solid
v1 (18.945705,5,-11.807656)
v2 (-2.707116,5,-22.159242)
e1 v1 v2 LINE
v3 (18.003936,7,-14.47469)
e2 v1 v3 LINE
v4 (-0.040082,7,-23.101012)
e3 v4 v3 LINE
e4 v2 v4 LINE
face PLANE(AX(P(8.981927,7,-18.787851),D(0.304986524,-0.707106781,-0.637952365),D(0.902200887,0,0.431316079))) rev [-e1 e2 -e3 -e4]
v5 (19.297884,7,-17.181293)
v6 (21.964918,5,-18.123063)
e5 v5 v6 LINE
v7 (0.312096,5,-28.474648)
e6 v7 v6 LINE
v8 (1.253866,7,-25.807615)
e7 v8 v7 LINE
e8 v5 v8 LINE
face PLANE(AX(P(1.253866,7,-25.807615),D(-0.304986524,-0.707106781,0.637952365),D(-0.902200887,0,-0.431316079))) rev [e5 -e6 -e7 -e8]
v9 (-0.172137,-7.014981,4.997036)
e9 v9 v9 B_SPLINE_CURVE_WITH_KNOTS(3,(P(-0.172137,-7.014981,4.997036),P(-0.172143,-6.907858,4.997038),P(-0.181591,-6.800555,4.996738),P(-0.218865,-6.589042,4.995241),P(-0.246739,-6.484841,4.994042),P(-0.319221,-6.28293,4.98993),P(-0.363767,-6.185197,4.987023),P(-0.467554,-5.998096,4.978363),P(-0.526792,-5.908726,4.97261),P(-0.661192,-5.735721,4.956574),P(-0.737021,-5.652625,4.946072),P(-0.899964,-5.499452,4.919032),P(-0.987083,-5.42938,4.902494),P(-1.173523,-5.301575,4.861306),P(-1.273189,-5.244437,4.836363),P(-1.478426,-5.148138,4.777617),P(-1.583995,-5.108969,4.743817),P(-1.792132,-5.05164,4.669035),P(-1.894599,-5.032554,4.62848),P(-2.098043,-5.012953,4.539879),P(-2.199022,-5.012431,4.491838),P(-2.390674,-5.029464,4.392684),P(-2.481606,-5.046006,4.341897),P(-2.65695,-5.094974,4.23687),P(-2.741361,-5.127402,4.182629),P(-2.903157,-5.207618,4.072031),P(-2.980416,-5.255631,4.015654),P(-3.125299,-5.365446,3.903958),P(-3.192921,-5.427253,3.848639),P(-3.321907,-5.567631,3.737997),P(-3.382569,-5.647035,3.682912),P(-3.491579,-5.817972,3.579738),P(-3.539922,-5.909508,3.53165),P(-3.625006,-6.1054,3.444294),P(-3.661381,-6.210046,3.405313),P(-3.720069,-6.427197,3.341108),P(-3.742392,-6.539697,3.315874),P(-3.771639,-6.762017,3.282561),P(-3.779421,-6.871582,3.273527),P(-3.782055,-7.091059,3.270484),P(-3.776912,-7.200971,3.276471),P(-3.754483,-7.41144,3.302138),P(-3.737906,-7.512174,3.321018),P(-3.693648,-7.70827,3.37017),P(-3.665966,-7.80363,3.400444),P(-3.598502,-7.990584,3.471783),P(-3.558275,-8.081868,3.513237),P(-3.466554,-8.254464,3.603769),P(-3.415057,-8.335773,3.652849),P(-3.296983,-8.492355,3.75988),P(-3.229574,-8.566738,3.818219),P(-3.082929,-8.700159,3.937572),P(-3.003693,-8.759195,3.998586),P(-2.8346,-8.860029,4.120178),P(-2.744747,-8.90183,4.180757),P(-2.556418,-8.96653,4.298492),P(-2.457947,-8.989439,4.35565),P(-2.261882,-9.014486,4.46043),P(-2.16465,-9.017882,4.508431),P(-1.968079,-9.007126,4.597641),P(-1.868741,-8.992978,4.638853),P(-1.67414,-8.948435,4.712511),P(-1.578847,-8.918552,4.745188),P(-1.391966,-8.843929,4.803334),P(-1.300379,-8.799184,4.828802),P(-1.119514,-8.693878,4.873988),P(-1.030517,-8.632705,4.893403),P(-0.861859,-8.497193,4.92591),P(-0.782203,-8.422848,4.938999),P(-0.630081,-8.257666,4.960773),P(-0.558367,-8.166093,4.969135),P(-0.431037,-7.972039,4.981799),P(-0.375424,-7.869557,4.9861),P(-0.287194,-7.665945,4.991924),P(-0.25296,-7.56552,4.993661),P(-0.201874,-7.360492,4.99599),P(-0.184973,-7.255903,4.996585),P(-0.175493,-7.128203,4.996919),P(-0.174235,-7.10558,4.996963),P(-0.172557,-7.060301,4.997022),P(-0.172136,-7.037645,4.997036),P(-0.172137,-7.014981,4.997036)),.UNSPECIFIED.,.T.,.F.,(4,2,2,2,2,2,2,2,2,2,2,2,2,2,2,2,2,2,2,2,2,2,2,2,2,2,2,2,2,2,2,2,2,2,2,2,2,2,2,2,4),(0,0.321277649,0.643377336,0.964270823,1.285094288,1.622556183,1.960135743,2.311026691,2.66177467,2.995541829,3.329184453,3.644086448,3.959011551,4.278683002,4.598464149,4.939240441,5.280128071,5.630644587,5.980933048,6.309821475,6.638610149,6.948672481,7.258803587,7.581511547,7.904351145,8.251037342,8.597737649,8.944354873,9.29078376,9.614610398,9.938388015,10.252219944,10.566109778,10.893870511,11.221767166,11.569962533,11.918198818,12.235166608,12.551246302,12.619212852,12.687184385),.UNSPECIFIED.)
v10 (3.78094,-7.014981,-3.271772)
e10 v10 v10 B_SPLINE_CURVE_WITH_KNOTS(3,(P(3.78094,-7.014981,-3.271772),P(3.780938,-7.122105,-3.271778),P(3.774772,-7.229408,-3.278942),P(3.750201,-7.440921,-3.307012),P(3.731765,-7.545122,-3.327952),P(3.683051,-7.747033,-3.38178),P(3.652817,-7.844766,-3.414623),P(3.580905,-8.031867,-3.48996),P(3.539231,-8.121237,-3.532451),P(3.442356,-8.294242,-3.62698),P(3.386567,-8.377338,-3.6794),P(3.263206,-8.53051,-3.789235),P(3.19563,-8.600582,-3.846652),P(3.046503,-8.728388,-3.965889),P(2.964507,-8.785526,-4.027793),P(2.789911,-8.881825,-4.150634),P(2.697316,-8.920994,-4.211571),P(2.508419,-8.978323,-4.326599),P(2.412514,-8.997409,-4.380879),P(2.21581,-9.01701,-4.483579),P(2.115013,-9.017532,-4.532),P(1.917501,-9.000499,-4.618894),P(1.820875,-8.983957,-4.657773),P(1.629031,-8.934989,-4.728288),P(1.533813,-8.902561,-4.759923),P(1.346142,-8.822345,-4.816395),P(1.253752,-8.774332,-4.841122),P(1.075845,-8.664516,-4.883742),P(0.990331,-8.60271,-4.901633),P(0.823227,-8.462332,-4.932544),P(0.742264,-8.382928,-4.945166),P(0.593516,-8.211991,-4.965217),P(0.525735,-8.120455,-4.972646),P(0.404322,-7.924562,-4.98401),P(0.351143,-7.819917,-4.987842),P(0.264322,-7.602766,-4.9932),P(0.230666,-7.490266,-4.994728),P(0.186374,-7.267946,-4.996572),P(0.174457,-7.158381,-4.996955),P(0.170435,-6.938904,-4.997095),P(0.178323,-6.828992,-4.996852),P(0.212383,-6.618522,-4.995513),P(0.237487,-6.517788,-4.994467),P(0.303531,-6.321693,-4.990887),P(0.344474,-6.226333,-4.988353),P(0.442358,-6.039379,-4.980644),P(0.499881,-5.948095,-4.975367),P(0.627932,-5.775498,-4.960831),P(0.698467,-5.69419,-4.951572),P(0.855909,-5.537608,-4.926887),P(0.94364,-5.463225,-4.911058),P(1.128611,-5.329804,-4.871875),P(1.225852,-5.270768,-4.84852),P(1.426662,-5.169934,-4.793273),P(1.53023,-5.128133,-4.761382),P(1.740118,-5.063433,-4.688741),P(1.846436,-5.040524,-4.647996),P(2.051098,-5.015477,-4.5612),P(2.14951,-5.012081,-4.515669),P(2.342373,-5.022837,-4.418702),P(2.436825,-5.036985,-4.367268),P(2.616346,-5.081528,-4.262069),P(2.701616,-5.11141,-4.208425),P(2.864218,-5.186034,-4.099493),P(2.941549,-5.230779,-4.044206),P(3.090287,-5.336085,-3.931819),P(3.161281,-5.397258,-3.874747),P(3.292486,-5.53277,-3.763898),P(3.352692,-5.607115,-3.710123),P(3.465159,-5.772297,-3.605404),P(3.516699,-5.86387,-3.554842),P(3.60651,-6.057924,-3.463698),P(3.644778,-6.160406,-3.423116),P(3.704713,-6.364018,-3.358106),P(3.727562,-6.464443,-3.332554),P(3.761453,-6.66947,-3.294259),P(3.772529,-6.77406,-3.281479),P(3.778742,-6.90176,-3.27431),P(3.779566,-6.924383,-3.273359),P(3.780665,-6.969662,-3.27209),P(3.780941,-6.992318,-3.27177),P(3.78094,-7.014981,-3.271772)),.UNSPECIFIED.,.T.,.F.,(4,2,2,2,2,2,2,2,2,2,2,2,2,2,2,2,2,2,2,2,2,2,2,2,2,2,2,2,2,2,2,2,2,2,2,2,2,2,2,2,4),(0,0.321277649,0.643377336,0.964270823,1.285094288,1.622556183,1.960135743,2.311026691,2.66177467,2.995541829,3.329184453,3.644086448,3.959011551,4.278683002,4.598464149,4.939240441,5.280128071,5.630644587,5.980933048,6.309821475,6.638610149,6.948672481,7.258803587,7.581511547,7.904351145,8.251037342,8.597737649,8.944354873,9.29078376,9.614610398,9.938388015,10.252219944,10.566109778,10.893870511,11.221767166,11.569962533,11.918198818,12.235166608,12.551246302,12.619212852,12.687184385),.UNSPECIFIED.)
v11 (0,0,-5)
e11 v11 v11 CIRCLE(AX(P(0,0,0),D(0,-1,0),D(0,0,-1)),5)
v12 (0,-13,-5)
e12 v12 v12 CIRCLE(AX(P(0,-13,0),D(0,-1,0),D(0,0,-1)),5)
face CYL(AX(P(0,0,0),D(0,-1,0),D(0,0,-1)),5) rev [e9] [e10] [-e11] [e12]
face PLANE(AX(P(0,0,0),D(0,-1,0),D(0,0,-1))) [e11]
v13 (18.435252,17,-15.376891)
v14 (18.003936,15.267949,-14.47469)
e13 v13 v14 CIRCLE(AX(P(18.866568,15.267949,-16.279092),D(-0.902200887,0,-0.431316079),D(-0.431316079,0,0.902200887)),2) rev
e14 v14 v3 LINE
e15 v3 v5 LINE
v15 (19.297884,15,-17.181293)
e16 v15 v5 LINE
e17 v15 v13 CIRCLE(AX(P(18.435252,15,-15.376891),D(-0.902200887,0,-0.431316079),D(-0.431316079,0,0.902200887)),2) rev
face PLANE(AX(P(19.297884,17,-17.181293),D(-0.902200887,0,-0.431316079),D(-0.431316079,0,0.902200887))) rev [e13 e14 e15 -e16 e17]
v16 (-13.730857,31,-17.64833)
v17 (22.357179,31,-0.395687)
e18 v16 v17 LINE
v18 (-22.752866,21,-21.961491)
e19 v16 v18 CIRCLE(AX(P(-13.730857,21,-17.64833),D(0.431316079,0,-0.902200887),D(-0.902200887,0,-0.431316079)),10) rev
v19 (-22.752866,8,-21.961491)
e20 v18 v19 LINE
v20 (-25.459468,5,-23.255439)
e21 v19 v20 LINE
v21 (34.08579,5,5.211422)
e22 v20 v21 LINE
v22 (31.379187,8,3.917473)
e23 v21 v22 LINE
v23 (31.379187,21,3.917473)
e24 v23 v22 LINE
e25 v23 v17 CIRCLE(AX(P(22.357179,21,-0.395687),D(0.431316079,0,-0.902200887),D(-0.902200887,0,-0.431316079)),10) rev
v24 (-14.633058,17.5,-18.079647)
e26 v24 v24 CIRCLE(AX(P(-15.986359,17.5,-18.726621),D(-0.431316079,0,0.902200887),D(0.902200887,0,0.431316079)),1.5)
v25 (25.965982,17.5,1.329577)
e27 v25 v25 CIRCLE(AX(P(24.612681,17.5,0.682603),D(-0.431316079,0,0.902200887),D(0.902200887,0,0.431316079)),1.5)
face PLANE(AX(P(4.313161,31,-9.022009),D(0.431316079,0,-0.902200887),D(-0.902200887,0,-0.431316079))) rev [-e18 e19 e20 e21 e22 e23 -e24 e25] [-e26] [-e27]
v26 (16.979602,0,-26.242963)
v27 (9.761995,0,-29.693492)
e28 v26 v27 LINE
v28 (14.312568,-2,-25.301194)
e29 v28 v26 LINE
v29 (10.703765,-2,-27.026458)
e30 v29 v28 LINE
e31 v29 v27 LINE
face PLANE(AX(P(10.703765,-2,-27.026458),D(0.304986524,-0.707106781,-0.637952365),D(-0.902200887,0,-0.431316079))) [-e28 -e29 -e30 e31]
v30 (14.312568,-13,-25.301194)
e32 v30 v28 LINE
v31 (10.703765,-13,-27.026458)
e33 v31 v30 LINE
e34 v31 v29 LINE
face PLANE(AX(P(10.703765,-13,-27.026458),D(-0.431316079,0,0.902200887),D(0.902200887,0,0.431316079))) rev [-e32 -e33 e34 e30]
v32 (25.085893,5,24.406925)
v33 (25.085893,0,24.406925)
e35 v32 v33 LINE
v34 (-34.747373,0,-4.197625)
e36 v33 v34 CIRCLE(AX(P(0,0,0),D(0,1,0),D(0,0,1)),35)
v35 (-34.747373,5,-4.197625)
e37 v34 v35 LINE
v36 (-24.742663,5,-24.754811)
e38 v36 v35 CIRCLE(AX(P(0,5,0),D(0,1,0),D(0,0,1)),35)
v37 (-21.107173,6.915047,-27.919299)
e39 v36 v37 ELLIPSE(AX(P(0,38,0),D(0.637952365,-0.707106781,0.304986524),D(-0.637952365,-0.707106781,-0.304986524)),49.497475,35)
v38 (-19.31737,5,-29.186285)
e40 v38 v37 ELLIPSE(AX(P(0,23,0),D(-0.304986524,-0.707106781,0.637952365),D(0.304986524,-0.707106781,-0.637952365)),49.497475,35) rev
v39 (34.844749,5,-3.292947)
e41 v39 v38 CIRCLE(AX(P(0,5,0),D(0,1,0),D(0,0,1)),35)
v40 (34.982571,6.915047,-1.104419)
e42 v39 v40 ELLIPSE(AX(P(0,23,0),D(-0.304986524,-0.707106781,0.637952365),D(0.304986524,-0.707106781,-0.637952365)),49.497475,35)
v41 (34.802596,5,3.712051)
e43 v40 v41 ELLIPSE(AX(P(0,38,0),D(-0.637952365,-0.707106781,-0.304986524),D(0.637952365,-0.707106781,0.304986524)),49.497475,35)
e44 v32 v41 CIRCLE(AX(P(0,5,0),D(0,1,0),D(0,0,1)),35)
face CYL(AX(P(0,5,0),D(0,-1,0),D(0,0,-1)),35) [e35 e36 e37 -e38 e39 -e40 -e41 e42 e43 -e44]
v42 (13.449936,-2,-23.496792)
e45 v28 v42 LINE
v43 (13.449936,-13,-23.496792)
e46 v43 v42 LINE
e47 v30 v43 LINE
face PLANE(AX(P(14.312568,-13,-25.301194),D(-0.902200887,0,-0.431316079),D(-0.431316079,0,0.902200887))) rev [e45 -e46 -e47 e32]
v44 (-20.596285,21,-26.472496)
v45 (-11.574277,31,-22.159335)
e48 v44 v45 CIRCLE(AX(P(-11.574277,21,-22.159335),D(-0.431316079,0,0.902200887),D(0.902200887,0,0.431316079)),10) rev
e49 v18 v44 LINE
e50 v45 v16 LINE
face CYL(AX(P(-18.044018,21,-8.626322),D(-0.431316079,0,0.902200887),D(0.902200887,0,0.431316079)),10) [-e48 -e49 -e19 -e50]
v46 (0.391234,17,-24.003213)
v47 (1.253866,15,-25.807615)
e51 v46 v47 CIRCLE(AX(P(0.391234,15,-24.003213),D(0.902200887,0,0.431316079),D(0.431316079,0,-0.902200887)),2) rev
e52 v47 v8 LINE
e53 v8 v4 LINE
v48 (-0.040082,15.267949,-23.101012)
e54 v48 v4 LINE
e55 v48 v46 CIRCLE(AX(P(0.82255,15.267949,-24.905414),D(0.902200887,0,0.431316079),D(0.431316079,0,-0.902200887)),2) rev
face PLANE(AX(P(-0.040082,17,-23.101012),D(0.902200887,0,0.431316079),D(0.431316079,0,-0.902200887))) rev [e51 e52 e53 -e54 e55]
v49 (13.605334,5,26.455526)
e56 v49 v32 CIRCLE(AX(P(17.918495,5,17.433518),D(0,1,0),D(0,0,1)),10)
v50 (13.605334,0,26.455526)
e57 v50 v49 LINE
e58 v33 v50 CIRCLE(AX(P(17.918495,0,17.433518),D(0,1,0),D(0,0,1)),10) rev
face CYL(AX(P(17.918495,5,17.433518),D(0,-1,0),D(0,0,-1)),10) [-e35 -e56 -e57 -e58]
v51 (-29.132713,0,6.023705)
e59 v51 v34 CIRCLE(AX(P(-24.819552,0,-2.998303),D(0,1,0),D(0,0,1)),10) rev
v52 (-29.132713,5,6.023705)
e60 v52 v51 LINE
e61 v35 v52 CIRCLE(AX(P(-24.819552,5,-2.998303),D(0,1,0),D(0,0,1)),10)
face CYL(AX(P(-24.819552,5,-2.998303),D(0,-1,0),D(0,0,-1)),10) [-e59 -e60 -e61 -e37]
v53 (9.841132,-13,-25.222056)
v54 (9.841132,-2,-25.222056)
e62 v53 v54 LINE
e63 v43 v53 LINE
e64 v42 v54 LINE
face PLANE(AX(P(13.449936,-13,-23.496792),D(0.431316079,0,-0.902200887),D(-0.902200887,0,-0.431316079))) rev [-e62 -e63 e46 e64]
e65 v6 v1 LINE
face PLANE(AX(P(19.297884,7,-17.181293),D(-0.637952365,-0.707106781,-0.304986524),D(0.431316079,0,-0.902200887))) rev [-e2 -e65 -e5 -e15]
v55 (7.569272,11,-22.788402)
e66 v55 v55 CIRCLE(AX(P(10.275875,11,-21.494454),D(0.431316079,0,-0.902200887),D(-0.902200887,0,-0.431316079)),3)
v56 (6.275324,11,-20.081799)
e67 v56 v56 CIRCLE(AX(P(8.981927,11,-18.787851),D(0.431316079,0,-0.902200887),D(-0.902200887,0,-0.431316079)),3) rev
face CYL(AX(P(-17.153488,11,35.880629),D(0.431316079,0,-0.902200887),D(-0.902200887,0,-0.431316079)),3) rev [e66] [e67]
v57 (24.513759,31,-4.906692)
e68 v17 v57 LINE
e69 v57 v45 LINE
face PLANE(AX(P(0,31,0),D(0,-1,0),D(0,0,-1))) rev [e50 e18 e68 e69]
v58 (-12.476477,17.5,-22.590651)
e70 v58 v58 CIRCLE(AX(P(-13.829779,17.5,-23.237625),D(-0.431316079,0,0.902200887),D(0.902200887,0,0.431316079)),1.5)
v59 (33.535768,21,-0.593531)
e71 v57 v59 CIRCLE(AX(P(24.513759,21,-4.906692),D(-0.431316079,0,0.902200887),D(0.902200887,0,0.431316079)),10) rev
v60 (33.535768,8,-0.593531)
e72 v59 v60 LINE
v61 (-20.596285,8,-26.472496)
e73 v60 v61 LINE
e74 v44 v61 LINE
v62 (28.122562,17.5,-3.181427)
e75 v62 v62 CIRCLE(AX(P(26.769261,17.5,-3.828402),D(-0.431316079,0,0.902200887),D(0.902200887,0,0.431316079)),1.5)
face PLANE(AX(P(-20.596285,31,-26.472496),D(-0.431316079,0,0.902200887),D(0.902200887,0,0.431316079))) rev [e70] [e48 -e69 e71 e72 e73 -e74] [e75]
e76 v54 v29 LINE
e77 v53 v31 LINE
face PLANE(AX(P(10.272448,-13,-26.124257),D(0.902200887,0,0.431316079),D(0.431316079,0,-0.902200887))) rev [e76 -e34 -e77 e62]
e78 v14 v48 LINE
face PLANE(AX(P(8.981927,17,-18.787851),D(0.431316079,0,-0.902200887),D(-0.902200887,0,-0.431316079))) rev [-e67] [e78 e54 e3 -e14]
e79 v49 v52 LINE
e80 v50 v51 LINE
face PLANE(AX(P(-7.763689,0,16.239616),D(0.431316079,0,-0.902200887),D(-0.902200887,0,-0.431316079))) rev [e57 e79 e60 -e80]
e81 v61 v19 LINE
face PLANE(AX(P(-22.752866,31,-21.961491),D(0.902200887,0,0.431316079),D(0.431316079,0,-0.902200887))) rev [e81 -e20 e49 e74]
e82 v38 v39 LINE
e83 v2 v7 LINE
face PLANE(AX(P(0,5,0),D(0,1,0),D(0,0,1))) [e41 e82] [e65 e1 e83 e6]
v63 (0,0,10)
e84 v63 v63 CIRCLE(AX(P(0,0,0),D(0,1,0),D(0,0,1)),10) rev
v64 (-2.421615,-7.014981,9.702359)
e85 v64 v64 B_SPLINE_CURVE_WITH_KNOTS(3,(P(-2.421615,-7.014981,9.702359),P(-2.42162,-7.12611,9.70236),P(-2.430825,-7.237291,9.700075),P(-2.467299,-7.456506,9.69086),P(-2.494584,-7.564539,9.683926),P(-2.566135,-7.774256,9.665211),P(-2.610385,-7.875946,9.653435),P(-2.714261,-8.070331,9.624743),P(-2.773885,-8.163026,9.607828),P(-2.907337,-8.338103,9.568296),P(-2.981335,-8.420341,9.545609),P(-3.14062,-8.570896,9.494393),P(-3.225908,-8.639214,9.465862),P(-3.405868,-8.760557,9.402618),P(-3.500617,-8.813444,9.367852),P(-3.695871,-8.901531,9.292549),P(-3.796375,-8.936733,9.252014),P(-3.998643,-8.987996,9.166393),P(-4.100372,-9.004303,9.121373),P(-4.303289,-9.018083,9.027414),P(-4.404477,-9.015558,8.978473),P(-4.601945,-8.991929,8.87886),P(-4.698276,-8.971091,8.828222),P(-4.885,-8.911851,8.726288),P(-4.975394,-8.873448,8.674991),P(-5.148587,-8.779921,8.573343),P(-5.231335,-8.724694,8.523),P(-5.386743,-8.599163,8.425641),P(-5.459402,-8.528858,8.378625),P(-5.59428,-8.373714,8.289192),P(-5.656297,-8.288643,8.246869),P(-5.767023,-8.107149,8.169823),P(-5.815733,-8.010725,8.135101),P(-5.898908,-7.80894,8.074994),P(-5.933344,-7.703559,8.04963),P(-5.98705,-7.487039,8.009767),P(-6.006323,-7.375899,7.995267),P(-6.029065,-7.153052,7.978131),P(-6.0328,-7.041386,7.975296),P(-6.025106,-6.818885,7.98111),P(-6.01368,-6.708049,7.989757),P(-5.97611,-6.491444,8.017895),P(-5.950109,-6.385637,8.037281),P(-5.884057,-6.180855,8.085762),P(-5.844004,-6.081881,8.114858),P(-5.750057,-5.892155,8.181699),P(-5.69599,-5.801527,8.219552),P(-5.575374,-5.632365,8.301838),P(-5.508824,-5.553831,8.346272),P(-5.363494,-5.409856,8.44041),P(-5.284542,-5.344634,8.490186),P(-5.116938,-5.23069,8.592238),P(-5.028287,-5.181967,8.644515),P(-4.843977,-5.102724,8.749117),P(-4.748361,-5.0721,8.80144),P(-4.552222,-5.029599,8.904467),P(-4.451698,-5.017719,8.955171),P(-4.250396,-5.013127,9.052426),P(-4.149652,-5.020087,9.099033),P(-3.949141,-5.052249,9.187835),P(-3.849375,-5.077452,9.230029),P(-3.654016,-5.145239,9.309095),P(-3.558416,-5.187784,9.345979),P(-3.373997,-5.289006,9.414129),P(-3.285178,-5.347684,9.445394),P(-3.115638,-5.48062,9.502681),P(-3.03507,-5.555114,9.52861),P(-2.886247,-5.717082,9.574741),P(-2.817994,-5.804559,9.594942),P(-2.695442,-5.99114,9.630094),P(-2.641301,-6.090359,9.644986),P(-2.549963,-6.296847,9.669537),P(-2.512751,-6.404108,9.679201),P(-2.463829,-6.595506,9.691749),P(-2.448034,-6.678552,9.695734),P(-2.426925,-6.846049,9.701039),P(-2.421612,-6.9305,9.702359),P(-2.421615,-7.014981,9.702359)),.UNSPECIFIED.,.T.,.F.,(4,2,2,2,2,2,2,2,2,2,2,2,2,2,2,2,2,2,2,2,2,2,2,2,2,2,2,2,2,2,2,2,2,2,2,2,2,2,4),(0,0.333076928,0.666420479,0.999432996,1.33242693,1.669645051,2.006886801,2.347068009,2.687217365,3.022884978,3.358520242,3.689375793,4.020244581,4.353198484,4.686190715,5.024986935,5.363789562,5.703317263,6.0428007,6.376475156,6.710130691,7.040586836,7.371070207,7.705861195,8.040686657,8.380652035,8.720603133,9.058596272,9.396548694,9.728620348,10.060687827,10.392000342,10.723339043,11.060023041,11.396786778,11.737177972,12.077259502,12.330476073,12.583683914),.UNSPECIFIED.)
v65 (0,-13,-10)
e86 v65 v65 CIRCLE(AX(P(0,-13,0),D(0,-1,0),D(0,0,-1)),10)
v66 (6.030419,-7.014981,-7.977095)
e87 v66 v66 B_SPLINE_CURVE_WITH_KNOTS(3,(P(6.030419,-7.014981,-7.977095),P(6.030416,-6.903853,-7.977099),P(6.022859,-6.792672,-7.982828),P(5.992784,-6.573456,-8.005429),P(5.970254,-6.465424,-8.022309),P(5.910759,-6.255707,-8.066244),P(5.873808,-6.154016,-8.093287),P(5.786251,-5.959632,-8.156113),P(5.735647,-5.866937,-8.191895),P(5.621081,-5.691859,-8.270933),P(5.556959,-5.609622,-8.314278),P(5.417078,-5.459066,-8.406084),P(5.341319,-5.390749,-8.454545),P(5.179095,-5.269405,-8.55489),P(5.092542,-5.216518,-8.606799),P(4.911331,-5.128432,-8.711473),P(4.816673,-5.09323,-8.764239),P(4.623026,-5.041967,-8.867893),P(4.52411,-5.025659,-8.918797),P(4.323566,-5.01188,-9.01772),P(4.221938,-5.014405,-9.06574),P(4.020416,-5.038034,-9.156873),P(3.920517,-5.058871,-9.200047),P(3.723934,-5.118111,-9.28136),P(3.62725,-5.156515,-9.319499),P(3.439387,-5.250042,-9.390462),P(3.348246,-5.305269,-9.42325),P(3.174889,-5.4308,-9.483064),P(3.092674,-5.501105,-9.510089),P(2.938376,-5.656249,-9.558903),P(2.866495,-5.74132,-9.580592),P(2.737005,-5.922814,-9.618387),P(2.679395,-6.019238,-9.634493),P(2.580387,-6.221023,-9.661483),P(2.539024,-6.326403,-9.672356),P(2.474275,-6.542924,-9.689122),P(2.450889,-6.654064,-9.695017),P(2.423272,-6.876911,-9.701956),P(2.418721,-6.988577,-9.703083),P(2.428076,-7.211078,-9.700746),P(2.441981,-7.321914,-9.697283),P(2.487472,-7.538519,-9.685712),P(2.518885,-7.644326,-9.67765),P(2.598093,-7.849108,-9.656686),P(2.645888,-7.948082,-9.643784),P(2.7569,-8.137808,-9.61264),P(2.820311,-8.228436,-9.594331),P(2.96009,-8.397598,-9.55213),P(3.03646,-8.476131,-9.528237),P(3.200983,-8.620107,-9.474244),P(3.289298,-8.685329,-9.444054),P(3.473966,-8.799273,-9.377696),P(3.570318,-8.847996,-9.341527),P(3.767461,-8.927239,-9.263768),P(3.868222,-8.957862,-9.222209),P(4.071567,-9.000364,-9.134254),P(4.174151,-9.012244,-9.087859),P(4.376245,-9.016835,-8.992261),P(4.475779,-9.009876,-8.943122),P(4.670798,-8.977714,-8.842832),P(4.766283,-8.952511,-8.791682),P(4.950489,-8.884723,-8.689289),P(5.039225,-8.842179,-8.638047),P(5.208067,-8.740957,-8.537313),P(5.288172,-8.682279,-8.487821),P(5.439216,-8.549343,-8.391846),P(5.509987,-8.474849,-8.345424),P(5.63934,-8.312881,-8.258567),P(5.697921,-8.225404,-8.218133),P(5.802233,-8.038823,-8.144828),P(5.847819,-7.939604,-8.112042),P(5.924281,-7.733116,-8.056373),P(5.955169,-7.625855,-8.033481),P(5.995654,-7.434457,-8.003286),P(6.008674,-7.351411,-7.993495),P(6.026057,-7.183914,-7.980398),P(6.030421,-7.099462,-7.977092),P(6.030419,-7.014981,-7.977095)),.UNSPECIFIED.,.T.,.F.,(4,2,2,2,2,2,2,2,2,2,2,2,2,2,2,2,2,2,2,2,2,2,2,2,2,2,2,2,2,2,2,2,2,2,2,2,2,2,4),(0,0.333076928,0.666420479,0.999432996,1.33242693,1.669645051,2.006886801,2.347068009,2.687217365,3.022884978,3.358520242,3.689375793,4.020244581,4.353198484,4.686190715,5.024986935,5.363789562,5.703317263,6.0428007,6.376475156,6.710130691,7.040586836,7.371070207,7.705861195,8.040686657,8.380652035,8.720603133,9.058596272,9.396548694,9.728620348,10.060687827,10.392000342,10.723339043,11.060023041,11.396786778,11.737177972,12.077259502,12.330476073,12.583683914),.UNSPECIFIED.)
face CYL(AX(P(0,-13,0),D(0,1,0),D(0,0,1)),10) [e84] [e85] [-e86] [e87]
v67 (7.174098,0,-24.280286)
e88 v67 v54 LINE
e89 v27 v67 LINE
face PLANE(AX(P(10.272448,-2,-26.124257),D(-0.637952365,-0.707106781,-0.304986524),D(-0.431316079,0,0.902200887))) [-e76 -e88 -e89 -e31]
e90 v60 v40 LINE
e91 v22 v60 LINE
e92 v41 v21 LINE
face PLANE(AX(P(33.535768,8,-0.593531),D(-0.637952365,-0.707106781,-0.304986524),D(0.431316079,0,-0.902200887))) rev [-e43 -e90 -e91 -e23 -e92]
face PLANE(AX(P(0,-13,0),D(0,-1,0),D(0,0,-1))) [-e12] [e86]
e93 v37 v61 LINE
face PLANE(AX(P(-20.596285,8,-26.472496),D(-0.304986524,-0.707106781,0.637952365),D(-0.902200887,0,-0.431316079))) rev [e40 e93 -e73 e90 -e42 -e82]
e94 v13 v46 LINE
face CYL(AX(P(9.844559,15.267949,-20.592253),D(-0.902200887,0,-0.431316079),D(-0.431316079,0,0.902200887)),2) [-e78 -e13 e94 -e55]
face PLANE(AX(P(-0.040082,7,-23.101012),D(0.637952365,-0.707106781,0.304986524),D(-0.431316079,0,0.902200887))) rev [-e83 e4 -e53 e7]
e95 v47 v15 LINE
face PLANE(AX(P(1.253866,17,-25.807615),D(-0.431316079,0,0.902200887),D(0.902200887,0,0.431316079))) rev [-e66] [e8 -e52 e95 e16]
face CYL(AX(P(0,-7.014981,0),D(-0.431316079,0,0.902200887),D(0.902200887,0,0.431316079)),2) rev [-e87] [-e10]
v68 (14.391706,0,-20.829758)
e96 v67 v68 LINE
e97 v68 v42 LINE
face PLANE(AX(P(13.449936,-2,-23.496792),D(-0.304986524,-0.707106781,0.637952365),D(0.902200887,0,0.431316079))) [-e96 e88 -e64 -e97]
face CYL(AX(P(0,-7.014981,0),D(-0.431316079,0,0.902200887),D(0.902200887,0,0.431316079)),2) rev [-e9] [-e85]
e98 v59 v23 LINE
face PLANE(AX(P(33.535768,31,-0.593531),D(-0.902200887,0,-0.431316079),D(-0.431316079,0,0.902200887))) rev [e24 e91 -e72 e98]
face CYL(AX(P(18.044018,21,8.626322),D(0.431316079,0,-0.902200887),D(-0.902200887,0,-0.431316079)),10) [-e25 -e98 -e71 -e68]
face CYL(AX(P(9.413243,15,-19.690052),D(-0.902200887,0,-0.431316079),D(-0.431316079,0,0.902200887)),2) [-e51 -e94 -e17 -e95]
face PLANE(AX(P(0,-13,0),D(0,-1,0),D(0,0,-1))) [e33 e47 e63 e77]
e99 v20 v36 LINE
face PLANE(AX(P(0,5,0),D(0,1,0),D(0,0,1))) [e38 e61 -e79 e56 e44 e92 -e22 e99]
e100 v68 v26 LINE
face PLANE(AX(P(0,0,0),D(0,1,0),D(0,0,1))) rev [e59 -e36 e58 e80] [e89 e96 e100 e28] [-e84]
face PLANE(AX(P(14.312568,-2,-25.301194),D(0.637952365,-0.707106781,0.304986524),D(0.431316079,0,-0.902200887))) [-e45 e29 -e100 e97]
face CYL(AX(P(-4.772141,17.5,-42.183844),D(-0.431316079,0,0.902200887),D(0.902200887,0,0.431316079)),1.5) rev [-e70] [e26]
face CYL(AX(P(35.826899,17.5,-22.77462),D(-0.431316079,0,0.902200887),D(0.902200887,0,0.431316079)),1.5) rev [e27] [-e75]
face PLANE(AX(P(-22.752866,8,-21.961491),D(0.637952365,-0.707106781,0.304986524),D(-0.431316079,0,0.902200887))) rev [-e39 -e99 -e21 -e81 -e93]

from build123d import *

# Parameters (mm, degrees)
ESBO_O1_R                 = 35
RESSALTO_EXTRUS_O1_DEPTH  = 5
ESBO_O3_R                 = 10
RESSALTO_EXTRUS_O3_DEPTH  = 13
ESBO_O4_R                 = 5
CORTE_EXTRUS_O1_DEPTH     = 13
RESSALTO_EXTRUS_O5_DEPTH  = 13
CORTE_EXTRUS_O6_START     = -11
CORTE_EXTRUS_O6_OUTLINE_R = 2
CORTE_EXTRUS_O6_DEPTH     = 22
CORTE_EXTRUS_O8_DEPTH     = 68.852738868
RESSALTO_EXTRUS_O7_DEPTH  = 26
ESBO_O19_R                = 1.5
CORTE_EXTRUS_O9_DEPTH     = 26
FILETE1_R                 = 10
FILETE2_R                 = 10
RESSALTO_EXTRUS_O9_DEPTH  = 12
CORTE_EXTRUS_O11_REACH    = 75.407
ESBO_O26_R                = 3
CHANFRO7_SIZE             = 3
CHANFRO8_SIZE             = 3
CHANFRO9_SIZE             = 3
CHANFRO10_SIZE            = 2
FILETE5_R                 = 2
FILETE6_R                 = 2
CHANFRO11_SIZE            = 2


with BuildPart() as part:
    # Esboço1 → Ressalto-extrusão1 (new body)
    with BuildSketch(Plane(origin=(0, 0, 0), x_dir=(1, 0, 0), z_dir=(0, 1, 0))):
        with Locations(Location((0, 0, 0), (0, 0, 270))):
            Circle(ESBO_O1_R)
    extrude(amount=RESSALTO_EXTRUS_O1_DEPTH)

    # Esboço3 → Ressalto-extrusão3 (add)
    with BuildSketch(Plane.XZ):
        with Locations(Location((0, 0, 0), (0, 0, 90))):
            Circle(ESBO_O3_R)
    extrude(amount=RESSALTO_EXTRUS_O3_DEPTH)

    # Esboço4 → Corte-extrusão1 (cut)
    with BuildSketch(Plane(origin=(0, -13, 0), x_dir=(-1, 0, 0), z_dir=(0, -1, 0))):
        with Locations(Location((0, 0, 0), (0, 0, 90))):
            Circle(ESBO_O4_R)
    extrude(amount=-CORTE_EXTRUS_O1_DEPTH, mode=Mode.SUBTRACT)

    # Esboço11 → Ressalto-extrusão5 (add)
    with BuildSketch(Plane.XZ):
        Polygon((10.27244843, -26.12425699), (10.703764509, -27.026457876), (14.312568056, -25.301193562), (13.449935899, -23.496791788), (9.841132351, -25.222056103), align=None)
    extrude(amount=RESSALTO_EXTRUS_O5_DEPTH)

    # Corte-extrusão6: read off the stored shape, not the designer's step
    # Corte-extrusão6 outline → Corte-extrusão6 (cut)
    with BuildSketch(Plane(origin=(0, 0, 0), x_dir=(0.9022008868624063, 0, 0.4313160786994702), z_dir=(0.43131607869947014, 0, -0.9022008868624064)).offset(CORTE_EXTRUS_O6_START)):
        with Locations((0, 7.014981428)):
            Circle(CORTE_EXTRUS_O6_OUTLINE_R)
    extrude(amount=CORTE_EXTRUS_O6_DEPTH, mode=Mode.SUBTRACT)

    # 3DSketch5 → Corte-extrusão8 (cut, through all)
    with BuildSketch(Plane(origin=(-8.247671749, -6.480100675, 16.008238046), x_dir=(0.7047714310013795, 0.6243195323179013, 0.3369307816312202), z_dir=(-0.43131607869947175, 0, 0.9022008868624055))):
        Polygon((0, 0), (-30.606987597, 24.461465293), (-10.703733889, 49.365069068), (51.063459474, 0), (31.160205765, -24.903603774), align=None)
    extrude(amount=CORTE_EXTRUS_O8_DEPTH, mode=Mode.SUBTRACT)

    # Esboço18 → Ressalto-extrusão7 (add)
    with BuildSketch(Plane(origin=(0, 5, 0), x_dir=(1, 0, 0), z_dir=(0, 1, 0))):
        Polygon((4.313160787, 9.022008869), (31.379187393, -3.917473492), (33.535767786, 0.593530942), (-20.596285425, 26.472495664), (-22.752865819, 21.96149123), align=None)
    extrude(amount=RESSALTO_EXTRUS_O7_DEPTH)

    # Esboço19 → Corte-extrusão9 (cut)
    with BuildSketch(Plane(origin=(4.313160787, 0, -9.022008869), x_dir=(0.9022008868624055, 0, 0.43131607869947175), z_dir=(-0.43131607869947175, 0, 0.9022008868624055))):
        with Locations((-22.5, 17.5)):
            Circle(ESBO_O19_R)
        with Locations((22.5, 17.5)):
            Circle(ESBO_O19_R)
    extrude(amount=-CORTE_EXTRUS_O9_DEPTH, mode=Mode.SUBTRACT)

    # Filete1
    filete1_edges = [part.edges().sort_by_distance(p)[0] for p in [
        (32.45747759, 31, 1.661971275),
        (-21.674575622, 31, -24.216993447),
    ]]
    fillet(filete1_edges, radius=FILETE1_R)

    # Filete2
    filete2_edges = [part.edges().sort_by_distance(p)[0] for p in [
        (19.317369696, 2.5, 29.18628493),
        (-34.844748529, 2.5, 3.292946997),
    ]]
    fillet(filete2_edges, radius=FILETE2_R)

    # Esboço25 → Ressalto-extrusão9 (add)
    with BuildSketch(Plane(origin=(0, 5, 0), x_dir=(1, 0, 0), z_dir=(0, 1, 0))):
        Polygon((8.981926733, 18.787851102), (-0.040082135, 23.101011889), (1.253866101, 25.80761455), (19.297883838, 17.181292976), (18.003935602, 14.474690315), align=None)
    extrude(amount=RESSALTO_EXTRUS_O9_DEPTH)

    # Esboço26 → Corte-extrusão11 (cut, up to next)
    with BuildSketch(Plane(origin=(10.275874969, 0, -21.494453763), x_dir=(-0.902200886862406, 0, -0.4313160786994711), z_dir=(0.4313160786994711, 0, -0.902200886862406)), mode=Mode.PRIVATE) as corte_extrus_o11_sk1:
        with Locations((0, 11)):
            Circle(ESBO_O26_R)
    corte_extrus_o11_tool1 = extrude(corte_extrus_o11_sk1.sketch, amount=-CORTE_EXTRUS_O11_REACH, mode=Mode.PRIVATE) & part.part
    add(corte_extrus_o11_tool1.solids().sort_by_distance((10.275875, 11, -21.494454))[0], mode=Mode.SUBTRACT)

    # Chanfro7
    chanfro7_edges = [part.edges().sort_by_distance(p)[0] for p in [
        (6.46974118, 5, -13.533013303),
    ]]
    chamfer(chanfro7_edges, length=CHANFRO7_SIZE)

    # Chanfro8
    # the kernel refuses this chamfer: 3 mm, written as the material it adds along each edge
    with BuildSketch(Plane(origin=(38.157340689, 5, -10.26065762), x_dir=(0.9022008868624055, 0, 0.43131607869947186), z_dir=(-0.4313160786994719, 0, 0.9022008868624055))) as chanfro8_piece_1_section:
        Polygon((CHANFRO8_SIZE, 0), (0, CHANFRO8_SIZE), (0, 0), align=None)
    chanfro8_piece_1 = extrude(amount=15.715048964, mode=Mode.PRIVATE)
    chanfro8_piece_1 = split(chanfro8_piece_1, bisect_by=Plane(origin=(36.493528356, 1.142475518, -6.780395611), z_dir=(-0.30498652408318644, -0.7071067811865479, 0.6379523650929244)), keep=Keep.TOP, mode=Mode.PRIVATE)
    chanfro8_piece_1 = chanfro8_piece_1 & Plane(origin=(0, 5, 0), x_dir=(0, 0, 1), z_dir=(0, -1, 0)) * Cylinder(35, 44, mode=Mode.PRIVATE)
    chanfro8_piece_1 = split(chanfro8_piece_1, bisect_by=Plane(origin=(33.535767786, 5, -0.593530942), z_dir=(0.4313160786994711, 0, -0.9022008868624058)), keep=Keep.TOP, mode=Mode.PRIVATE)
    add(chanfro8_piece_1)
    with BuildSketch(Plane(origin=(38.157340689, 5, -10.26065762), x_dir=(0.9022008868624055, 0, 0.43131607869947186), z_dir=(-0.4313160786994719, 0, 0.9022008868624055))) as chanfro8_piece_2_section:
        Polygon((CHANFRO8_SIZE, 0), (0, CHANFRO8_SIZE), (0, 0), align=None)
    chanfro8_piece_2 = extrude(amount=15.715048964, mode=Mode.PRIVATE)
    chanfro8_piece_2 = split(chanfro8_piece_2, bisect_by=Plane(origin=(36.493528356, 1.142475518, -6.780395611), z_dir=(-0.30498652408318644, -0.7071067811865479, 0.6379523650929244)), keep=Keep.TOP, mode=Mode.PRIVATE)
    chanfro8_piece_2 = chanfro8_piece_2 & Plane(origin=(0, 5, 0), x_dir=(0, 0, 1), z_dir=(0, -1, 0)) * Cylinder(35, 44, mode=Mode.PRIVATE)
    chanfro8_piece_2 = split(chanfro8_piece_2, bisect_by=Plane(origin=(33.535767786, 5, -0.593530942), z_dir=(-0.4313160786994711, 0, 0.9022008868624058)), keep=Keep.TOP, mode=Mode.PRIVATE)
    add(chanfro8_piece_2)

    # Chanfro9
    # the kernel refuses this chamfer: 3 mm, written as the material it adds along each edge
    with BuildSketch(Plane(origin=(-22.752865819, 5, -21.96149123), x_dir=(0, 1, 0), z_dir=(0.431316078699471, 0, -0.902200886862406))) as chanfro9_piece_1_section:
        Polygon((CHANFRO9_SIZE, 0), (0, -CHANFRO9_SIZE), (0, 0), align=None)
    chanfro9_piece_1 = extrude(amount=15.715048964, mode=Mode.PRIVATE)
    chanfro9_piece_1 = split(chanfro9_piece_1, bisect_by=Plane(origin=(-20.596285425, 5, -26.472495664), z_dir=(-0.4313160786994711, 0, 0.9022008868624058)), keep=Keep.TOP, mode=Mode.PRIVATE)
    chanfro9_piece_1 = split(chanfro9_piece_1, bisect_by=Plane(origin=(-21.027601504, 9, -25.570294777), z_dir=(-0.30498652408290505, -0.7071067811867798, 0.6379523650928014)), keep=Keep.TOP, mode=Mode.PRIVATE)
    chanfro9_piece_1 = chanfro9_piece_1 & Plane(origin=(0, 5, 0), x_dir=(0, 0, 1), z_dir=(0, -1, 0)) * Cylinder(35, 44, mode=Mode.PRIVATE)
    add(chanfro9_piece_1)
    with BuildSketch(Plane(origin=(-22.752865819, 5, -21.96149123), x_dir=(0, 1, 0), z_dir=(0.431316078699471, 0, -0.902200886862406))) as chanfro9_piece_2_section:
        Polygon((CHANFRO9_SIZE, 0), (0, -CHANFRO9_SIZE), (0, 0), align=None)
    chanfro9_piece_2 = extrude(amount=15.715048964, mode=Mode.PRIVATE)
    chanfro9_piece_2 = split(chanfro9_piece_2, bisect_by=Plane(origin=(-20.596285425, 5, -26.472495664), z_dir=(0.4313160786994711, 0, -0.9022008868624058)), keep=Keep.TOP, mode=Mode.PRIVATE)
    chanfro9_piece_2 = split(chanfro9_piece_2, bisect_by=Plane(origin=(-21.027601504, 9, -25.570294777), z_dir=(-0.30498652408290505, -0.7071067811867798, 0.6379523650928014)), keep=Keep.TOP, mode=Mode.PRIVATE)
    chanfro9_piece_2 = chanfro9_piece_2 & Plane(origin=(0, 5, 0), x_dir=(0, 0, 1), z_dir=(0, -1, 0)) * Cylinder(35, 44, mode=Mode.PRIVATE)
    add(chanfro9_piece_2)

    # Chanfro10
    chanfro10_edges = [part.edges().sort_by_distance(p)[0] for p in [
        (18.65090972, 5, -15.827991645),
        (10.275874969, 5, -21.494453763),
        (0.606891983, 5, -24.454313219),
        (8.981926733, 5, -18.787851102),
    ]]
    chamfer(chanfro10_edges, length=CHANFRO10_SIZE)

    # Filete5
    filete5_edges = [part.edges().sort_by_distance(p)[0] for p in [
        (10.275874969, 17, -21.494453763),
    ]]
    fillet(filete5_edges, radius=FILETE5_R)

    # Filete6
    # the kernel refuses this fillet: 2 mm, written as the material it takes off along each edge
    with BuildSketch(Plane(origin=(21.910580039, 17, -12.607036909), x_dir=(0.4313160786994712, -7.105427357600661e-14, -0.9022008868624057), z_dir=(-0.9022008868624058, 0, -0.4313160786994713))) as filete6_piece_1:
        with BuildLine():
            CenterArc((2, 1.732050808), FILETE6_R, 180, 60)
            Line((0, 1.732050808), (-0.04, 1.732050808))
            Line((-0.04, 1.732050808), (-0.04, 0))
            Line((-0.04, 0), (0, -0.04))
            ThreePointArc((0, -0.04), (0.5, -0.04), (0.98, -0.034641016))
            Line((0.98, -0.034641016), (1, 0))
        make_face()
    extrude(amount=28.660254038, mode=Mode.SUBTRACT)

    # Chanfro11
    chanfro11_edges = [part.edges().sort_by_distance(p)[0] for p in [
        (10.27244843, 0, -26.12425699),
        (12.508166282, 0, -26.163825719),
        (13.881251977, 0, -24.398992675),
        (11.645534125, 0, -24.359423945),
    ]]
    chamfer(chanfro11_edges, length=CHANFRO11_SIZE)


solid = part.part
